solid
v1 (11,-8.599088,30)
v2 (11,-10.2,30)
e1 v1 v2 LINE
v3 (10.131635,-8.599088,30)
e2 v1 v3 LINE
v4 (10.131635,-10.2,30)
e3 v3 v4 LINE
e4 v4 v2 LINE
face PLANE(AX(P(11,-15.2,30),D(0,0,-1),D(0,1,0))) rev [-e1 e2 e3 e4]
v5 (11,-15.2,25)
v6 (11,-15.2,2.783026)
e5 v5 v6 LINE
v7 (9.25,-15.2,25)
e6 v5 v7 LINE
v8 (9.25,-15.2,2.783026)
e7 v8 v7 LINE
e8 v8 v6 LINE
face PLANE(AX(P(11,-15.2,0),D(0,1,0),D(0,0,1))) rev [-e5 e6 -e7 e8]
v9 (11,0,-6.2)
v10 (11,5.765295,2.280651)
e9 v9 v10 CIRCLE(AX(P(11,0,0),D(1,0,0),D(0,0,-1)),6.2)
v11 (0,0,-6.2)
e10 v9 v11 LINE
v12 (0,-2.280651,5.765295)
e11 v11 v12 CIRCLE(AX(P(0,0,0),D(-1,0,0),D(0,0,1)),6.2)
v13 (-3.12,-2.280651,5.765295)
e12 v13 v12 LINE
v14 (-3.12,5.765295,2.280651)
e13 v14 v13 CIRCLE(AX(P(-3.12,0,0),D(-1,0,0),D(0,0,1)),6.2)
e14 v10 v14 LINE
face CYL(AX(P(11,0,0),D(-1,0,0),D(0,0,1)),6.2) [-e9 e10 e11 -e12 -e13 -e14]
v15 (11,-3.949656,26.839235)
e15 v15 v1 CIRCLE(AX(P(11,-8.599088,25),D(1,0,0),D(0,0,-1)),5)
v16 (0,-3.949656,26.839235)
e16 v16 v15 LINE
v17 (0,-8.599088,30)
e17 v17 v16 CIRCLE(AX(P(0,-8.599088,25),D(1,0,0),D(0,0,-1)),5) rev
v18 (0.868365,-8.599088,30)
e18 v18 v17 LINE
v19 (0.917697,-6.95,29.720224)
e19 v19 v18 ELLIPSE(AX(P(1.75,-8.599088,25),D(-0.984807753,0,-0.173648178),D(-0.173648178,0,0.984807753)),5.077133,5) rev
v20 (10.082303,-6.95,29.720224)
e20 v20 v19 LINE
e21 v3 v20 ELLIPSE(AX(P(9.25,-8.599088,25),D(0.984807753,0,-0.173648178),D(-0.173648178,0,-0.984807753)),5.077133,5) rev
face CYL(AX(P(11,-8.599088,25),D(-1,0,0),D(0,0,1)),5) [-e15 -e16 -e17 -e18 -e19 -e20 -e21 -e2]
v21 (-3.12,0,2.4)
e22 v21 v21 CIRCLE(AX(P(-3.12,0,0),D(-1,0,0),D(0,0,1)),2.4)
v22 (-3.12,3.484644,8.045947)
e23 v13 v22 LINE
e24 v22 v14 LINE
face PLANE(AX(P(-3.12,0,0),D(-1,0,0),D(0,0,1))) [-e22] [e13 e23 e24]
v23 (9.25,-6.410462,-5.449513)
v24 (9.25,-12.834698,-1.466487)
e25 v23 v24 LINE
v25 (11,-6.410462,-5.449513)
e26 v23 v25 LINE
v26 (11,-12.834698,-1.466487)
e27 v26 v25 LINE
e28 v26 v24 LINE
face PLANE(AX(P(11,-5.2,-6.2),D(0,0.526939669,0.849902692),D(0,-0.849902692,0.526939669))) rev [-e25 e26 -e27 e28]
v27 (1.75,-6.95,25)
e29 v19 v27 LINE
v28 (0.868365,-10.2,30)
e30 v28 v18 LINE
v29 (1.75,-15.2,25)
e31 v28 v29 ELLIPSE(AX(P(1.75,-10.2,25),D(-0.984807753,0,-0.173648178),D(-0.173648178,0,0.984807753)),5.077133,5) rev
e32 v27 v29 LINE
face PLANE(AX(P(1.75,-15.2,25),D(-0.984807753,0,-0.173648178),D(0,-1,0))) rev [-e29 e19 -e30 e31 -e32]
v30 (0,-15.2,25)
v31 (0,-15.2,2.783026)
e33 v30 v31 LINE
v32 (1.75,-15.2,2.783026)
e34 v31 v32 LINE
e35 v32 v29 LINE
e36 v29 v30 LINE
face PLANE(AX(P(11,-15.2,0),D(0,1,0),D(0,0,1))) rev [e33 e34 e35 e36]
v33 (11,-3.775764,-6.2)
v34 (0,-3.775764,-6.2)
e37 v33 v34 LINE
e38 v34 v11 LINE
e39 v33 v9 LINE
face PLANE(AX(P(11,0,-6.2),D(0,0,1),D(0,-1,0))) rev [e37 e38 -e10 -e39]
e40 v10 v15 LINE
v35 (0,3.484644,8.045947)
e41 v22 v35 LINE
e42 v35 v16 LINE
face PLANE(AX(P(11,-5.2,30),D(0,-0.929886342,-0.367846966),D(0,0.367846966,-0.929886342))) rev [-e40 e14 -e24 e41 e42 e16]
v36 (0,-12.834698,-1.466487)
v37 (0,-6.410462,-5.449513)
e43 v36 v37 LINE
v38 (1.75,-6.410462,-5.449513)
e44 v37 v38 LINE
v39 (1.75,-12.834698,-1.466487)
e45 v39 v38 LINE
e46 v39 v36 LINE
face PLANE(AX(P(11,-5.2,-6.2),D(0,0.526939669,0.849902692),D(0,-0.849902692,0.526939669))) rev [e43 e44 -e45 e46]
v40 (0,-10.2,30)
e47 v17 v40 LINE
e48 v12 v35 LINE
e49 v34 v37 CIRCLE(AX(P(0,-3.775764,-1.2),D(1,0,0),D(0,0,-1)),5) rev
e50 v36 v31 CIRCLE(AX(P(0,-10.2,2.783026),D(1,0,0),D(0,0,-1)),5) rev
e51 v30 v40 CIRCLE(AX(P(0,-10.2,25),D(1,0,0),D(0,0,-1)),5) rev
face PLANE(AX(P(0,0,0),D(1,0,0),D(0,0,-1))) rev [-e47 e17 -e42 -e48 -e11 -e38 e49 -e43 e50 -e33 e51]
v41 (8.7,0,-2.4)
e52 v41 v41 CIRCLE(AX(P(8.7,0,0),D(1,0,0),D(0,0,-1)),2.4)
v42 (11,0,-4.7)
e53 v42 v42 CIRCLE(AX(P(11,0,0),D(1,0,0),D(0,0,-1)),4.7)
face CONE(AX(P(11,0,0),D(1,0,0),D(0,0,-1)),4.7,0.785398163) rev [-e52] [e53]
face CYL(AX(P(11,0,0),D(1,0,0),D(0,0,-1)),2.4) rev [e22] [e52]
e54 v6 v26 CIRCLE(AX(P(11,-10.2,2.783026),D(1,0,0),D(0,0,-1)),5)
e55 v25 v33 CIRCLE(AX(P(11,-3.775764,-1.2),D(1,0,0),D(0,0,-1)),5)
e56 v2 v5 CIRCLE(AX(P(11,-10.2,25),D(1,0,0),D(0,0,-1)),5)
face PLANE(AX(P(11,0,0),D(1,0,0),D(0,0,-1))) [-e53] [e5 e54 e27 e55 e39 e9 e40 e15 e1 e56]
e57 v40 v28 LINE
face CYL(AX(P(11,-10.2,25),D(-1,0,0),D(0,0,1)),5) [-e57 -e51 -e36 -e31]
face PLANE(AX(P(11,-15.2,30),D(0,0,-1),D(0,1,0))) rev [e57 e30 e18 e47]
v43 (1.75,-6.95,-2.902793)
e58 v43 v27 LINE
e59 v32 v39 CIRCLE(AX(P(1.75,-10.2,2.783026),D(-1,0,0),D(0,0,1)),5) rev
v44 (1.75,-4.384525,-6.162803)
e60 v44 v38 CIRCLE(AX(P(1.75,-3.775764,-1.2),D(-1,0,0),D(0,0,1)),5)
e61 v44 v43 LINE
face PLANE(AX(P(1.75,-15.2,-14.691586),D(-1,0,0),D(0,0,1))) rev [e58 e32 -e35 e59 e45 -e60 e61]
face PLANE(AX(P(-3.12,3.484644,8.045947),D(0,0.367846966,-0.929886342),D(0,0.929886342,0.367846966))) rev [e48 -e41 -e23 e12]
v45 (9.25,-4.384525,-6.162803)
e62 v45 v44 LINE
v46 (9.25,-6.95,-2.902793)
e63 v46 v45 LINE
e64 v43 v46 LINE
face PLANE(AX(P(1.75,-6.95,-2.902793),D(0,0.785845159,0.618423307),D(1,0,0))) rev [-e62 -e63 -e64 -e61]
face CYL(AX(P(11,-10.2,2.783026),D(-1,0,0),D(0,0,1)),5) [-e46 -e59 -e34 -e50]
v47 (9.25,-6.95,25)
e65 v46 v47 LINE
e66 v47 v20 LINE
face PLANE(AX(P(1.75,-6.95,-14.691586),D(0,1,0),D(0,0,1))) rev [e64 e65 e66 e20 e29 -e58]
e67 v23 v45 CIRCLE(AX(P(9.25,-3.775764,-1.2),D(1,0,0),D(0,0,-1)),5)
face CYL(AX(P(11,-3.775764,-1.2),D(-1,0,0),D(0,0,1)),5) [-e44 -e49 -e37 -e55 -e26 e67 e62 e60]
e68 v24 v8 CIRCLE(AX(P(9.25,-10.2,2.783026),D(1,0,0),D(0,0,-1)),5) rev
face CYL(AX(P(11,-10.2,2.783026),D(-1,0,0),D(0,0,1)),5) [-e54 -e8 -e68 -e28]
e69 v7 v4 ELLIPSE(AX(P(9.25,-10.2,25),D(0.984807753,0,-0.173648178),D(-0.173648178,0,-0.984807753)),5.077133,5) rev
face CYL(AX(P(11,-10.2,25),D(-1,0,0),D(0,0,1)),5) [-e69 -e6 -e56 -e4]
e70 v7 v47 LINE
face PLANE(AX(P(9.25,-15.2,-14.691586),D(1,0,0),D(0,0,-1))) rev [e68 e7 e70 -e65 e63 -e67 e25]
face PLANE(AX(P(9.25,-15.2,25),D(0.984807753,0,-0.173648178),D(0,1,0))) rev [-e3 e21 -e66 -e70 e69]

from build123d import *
from OCP.BRepFilletAPI import BRepFilletAPI_MakeChamfer

# Parameters (mm, degrees)
SKETCH1_R                                       = 2.2
BOSS_EXTRUDE1_DEPTH                             = 11
CUT_EXTRUDE1_REACH                              = 42.774
SKETCH2_W                                       = 7.5
SKETCH2_H                                       = 8.25
CHAMFER3_SIZE                                   = 5
CHAMFER3_SIZE2                                  = 0.881634904
FILLET1_R                                       = 5
CHAMFER1_SIZE                                   = 2.212207332
CHAMFER1_SIZE_2                                 = 4
CSK_FOR_M4_FLAT_HEAD_MACHINE_SCREW1_D           = 4.8
CSK_FOR_M4_FLAT_HEAD_MACHINE_SCREW1_CSINK_D     = 9.4
CSK_FOR_M4_FLAT_HEAD_MACHINE_SCREW1_CSINK_ANGLE = 90
BOSS_EXTRUDE2_START                             = 3.12
SKETCH6_R                                       = 2.4
BOSS_EXTRUDE2_DEPTH                             = 3.12


with BuildPart() as part:
    # Sketch1 → Boss-Extrude1 (new body)
    with BuildSketch(Plane(origin=(0, 0, 0), x_dir=(0, 0, -1), z_dir=(1, 0, 0))):
        with BuildLine():
            Line((-30, -15.2), (-30, -5.2))
            Line((-30, -5.2), (-2.280651189, 5.765295322))
            ThreePointArc((-2.280651189, 5.765295322), (3.485682331, 5.12737932), (6.2, 0))
            Line((6.2, 0), (6.2, -5.2))
            Line((6.2, -5.2), (0, -15.2))
            Line((0, -15.2), (-30, -15.2))
        make_face()
        Circle(SKETCH1_R, mode=Mode.SUBTRACT)
    extrude(amount=BOSS_EXTRUDE1_DEPTH)

    # Cut-Extrude1: up to this plane
    cut_extrude1_end = Plane(origin=(11, -5.2, -6.2), z_dir=(0, 0.5269396688616753, 0.8499026917123795))
    # Sketch2 → Cut-Extrude1 (cut, up to the surface)
    with BuildSketch(Plane.XY.offset(30), mode=Mode.PRIVATE) as cut_extrude1_sk1:
        with Locations((5.5, -11.075)):
            Rectangle(SKETCH2_W, SKETCH2_H)
    cut_extrude1_tool1 = split(extrude(cut_extrude1_sk1.sketch, amount=-CUT_EXTRUDE1_REACH, mode=Mode.PRIVATE), bisect_by=cut_extrude1_end, keep=Keep.BOTH, mode=Mode.PRIVATE)
    add(cut_extrude1_tool1.solids().sort_by_distance((5.5, -11.075, 30))[0], mode=Mode.SUBTRACT)

    # Chamfer3: one chamfer whose edges measure the first distance from different faces: ONE call of the kernel's chamfer builder (chamfer() names one face for all edges)
    chamfer3_edges_1 = [part.edges().sort_by_distance(p)[0] for p in [
        (1.75, -11.075, 30),
    ]]
    chamfer3_side_1 = [part.faces().sort_by_distance(p)[0] for p in [
        (1.75, -10.966989173, 13.687766644),
    ]]
    chamfer3_edges_2 = [part.edges().sort_by_distance(p)[0] for p in [
        (9.25, -11.075, 30),
    ]]
    chamfer3_side_2 = [part.faces().sort_by_distance(p)[0] for p in [
        (9.25, -10.966989173, 13.687766644),
    ]]
    chamfer3 = BRepFilletAPI_MakeChamfer(part.part.solid().wrapped)
    for e in chamfer3_edges_1:
        chamfer3.Add(CHAMFER3_SIZE, CHAMFER3_SIZE2, e.wrapped, chamfer3_side_1[0].wrapped)  # the first distance lies on this face
    for e in chamfer3_edges_2:
        chamfer3.Add(CHAMFER3_SIZE, CHAMFER3_SIZE2, e.wrapped, chamfer3_side_2[0].wrapped)  # the first distance lies on this face
    add(Compound.cast(chamfer3.Shape()), mode=Mode.REPLACE)

    # Fillet1
    # the kernel refuses this fillet: 5 mm, written as the material it takes off along each edge
    with BuildSketch(Plane(origin=(-12.5, -15.2, 30), x_dir=(0, 1, 0), z_dir=(1, 0, 0)), Plane(origin=(-2.368365096, -15.2, 30), x_dir=(0, 1, 0), z_dir=(1, 0, 0))) as fillet1_piece_1:
        with BuildLine():
            CenterArc((FILLET1_R, -FILLET1_R), FILLET1_R, 90, 90)
            Line((0, -FILLET1_R), (0, 0))
            Line((0, 0), (FILLET1_R, 0))
        make_face()
    extrude(amount=25.868365096, mode=Mode.SUBTRACT)
    with BuildSketch(Plane(origin=(-3.560590452, -5.2, -6.2), x_dir=(0, -0.8499026917123794, 0.5269396688616755), z_dir=(1, 0, 0))) as fillet1_piece_2:
        with BuildLine():
            CenterArc((FILLET1_R * 0.28484723614, -FILLET1_R), FILLET1_R, 90, 31.798912824)
            Line((-FILLET1_R * 0.242092432722, -FILLET1_R * 0.150097308288), (0, 0))
            Line((0, 0), (FILLET1_R * 0.28484723614, 0))
        make_face()
    extrude(amount=18.121180903, mode=Mode.SUBTRACT)
    with BuildSketch(Plane(origin=(-6.95756608, -15.2, 0), x_dir=(0, 0.8499026917123792, -0.5269396688616758), z_dir=(1, 0, 0)), Plane(origin=(2.29243392, -15.2, 0), x_dir=(0, 0.8499026917123792, -0.5269396688616758), z_dir=(1, 0, 0))) as fillet1_piece_3:
        with BuildLine():
            CenterArc((FILLET1_R * 0.556605286407, FILLET1_R), FILLET1_R, 211.798912824, 58.201087176)
            Line((-FILLET1_R * 0.293297405306, FILLET1_R * 0.473060331138), (0, 0))
            Line((0, 0), (FILLET1_R * 0.556605286407, 0))
        make_face()
    extrude(amount=15.66513216, mode=Mode.SUBTRACT)
    with BuildSketch(Plane(origin=(-8.497719093, -5.2, 30), x_dir=(0, -1, 0), z_dir=(1, 0, 0))) as fillet1_piece_4:
        with BuildLine():
            CenterArc((FILLET1_R * 0.679817527413, FILLET1_R), FILLET1_R, 201.582895238, 68.417104762)
            Line((-FILLET1_R * 0.250068814892, FILLET1_R * 0.632153034001), (0, 0))
            Line((0, 0), (FILLET1_R * 0.679817527413, 0))
        make_face()
    extrude(amount=27.995438185, mode=Mode.SUBTRACT)

    # Chamfer1
    # the kernel refuses this chamfer: 4, 2.212207332 mm, written as the material it takes off along each edge
    with BuildSketch(Plane(origin=(1.75, -6.95, -5.115), x_dir=(0, -0.04228471314336273, 0.9991056015428917), z_dir=(1, 0, 0))) as chamfer1_piece_1:
        Polygon((CHAMFER1_SIZE * 0.999105601467, -CHAMFER1_SIZE * 0.0422847131402), (-CHAMFER1_SIZE_2 * 0.562406266354, -CHAMFER1_SIZE_2 * 0.826861047315), (0, 0), align=None)
    extrude(amount=7.5, mode=Mode.SUBTRACT)

    # CSK for M4 Flat Head Machine Screw1 (through all)
    with Locations(Plane(origin=(11, 0, 0), x_dir=(0, 0, -1), z_dir=(1, 0, 0))):
        with Locations((0, 0)):
            CounterSinkHole(CSK_FOR_M4_FLAT_HEAD_MACHINE_SCREW1_D / 2, CSK_FOR_M4_FLAT_HEAD_MACHINE_SCREW1_CSINK_D / 2, counter_sink_angle=CSK_FOR_M4_FLAT_HEAD_MACHINE_SCREW1_CSINK_ANGLE)

    # Sketch6 → Boss-Extrude2 (add)
    with BuildSketch(Plane.ZY.offset(BOSS_EXTRUDE2_START)):
        with BuildLine():
            Line((8.045946511, 3.484644133), (5.765295322, -2.280651189))
            ThreePointArc((5.765295322, -2.280651189), (-5.689343339, -2.464015497), (2.280651189, 5.765295322))
            Line((2.280651189, 5.765295322), (8.045946511, 3.484644133))
        make_face()
        with Locations(Location((0, 0, 0), (0, 0, 180))):
            Circle(SKETCH6_R, mode=Mode.SUBTRACT)
    extrude(amount=-BOSS_EXTRUDE2_DEPTH)


solid = part.part
